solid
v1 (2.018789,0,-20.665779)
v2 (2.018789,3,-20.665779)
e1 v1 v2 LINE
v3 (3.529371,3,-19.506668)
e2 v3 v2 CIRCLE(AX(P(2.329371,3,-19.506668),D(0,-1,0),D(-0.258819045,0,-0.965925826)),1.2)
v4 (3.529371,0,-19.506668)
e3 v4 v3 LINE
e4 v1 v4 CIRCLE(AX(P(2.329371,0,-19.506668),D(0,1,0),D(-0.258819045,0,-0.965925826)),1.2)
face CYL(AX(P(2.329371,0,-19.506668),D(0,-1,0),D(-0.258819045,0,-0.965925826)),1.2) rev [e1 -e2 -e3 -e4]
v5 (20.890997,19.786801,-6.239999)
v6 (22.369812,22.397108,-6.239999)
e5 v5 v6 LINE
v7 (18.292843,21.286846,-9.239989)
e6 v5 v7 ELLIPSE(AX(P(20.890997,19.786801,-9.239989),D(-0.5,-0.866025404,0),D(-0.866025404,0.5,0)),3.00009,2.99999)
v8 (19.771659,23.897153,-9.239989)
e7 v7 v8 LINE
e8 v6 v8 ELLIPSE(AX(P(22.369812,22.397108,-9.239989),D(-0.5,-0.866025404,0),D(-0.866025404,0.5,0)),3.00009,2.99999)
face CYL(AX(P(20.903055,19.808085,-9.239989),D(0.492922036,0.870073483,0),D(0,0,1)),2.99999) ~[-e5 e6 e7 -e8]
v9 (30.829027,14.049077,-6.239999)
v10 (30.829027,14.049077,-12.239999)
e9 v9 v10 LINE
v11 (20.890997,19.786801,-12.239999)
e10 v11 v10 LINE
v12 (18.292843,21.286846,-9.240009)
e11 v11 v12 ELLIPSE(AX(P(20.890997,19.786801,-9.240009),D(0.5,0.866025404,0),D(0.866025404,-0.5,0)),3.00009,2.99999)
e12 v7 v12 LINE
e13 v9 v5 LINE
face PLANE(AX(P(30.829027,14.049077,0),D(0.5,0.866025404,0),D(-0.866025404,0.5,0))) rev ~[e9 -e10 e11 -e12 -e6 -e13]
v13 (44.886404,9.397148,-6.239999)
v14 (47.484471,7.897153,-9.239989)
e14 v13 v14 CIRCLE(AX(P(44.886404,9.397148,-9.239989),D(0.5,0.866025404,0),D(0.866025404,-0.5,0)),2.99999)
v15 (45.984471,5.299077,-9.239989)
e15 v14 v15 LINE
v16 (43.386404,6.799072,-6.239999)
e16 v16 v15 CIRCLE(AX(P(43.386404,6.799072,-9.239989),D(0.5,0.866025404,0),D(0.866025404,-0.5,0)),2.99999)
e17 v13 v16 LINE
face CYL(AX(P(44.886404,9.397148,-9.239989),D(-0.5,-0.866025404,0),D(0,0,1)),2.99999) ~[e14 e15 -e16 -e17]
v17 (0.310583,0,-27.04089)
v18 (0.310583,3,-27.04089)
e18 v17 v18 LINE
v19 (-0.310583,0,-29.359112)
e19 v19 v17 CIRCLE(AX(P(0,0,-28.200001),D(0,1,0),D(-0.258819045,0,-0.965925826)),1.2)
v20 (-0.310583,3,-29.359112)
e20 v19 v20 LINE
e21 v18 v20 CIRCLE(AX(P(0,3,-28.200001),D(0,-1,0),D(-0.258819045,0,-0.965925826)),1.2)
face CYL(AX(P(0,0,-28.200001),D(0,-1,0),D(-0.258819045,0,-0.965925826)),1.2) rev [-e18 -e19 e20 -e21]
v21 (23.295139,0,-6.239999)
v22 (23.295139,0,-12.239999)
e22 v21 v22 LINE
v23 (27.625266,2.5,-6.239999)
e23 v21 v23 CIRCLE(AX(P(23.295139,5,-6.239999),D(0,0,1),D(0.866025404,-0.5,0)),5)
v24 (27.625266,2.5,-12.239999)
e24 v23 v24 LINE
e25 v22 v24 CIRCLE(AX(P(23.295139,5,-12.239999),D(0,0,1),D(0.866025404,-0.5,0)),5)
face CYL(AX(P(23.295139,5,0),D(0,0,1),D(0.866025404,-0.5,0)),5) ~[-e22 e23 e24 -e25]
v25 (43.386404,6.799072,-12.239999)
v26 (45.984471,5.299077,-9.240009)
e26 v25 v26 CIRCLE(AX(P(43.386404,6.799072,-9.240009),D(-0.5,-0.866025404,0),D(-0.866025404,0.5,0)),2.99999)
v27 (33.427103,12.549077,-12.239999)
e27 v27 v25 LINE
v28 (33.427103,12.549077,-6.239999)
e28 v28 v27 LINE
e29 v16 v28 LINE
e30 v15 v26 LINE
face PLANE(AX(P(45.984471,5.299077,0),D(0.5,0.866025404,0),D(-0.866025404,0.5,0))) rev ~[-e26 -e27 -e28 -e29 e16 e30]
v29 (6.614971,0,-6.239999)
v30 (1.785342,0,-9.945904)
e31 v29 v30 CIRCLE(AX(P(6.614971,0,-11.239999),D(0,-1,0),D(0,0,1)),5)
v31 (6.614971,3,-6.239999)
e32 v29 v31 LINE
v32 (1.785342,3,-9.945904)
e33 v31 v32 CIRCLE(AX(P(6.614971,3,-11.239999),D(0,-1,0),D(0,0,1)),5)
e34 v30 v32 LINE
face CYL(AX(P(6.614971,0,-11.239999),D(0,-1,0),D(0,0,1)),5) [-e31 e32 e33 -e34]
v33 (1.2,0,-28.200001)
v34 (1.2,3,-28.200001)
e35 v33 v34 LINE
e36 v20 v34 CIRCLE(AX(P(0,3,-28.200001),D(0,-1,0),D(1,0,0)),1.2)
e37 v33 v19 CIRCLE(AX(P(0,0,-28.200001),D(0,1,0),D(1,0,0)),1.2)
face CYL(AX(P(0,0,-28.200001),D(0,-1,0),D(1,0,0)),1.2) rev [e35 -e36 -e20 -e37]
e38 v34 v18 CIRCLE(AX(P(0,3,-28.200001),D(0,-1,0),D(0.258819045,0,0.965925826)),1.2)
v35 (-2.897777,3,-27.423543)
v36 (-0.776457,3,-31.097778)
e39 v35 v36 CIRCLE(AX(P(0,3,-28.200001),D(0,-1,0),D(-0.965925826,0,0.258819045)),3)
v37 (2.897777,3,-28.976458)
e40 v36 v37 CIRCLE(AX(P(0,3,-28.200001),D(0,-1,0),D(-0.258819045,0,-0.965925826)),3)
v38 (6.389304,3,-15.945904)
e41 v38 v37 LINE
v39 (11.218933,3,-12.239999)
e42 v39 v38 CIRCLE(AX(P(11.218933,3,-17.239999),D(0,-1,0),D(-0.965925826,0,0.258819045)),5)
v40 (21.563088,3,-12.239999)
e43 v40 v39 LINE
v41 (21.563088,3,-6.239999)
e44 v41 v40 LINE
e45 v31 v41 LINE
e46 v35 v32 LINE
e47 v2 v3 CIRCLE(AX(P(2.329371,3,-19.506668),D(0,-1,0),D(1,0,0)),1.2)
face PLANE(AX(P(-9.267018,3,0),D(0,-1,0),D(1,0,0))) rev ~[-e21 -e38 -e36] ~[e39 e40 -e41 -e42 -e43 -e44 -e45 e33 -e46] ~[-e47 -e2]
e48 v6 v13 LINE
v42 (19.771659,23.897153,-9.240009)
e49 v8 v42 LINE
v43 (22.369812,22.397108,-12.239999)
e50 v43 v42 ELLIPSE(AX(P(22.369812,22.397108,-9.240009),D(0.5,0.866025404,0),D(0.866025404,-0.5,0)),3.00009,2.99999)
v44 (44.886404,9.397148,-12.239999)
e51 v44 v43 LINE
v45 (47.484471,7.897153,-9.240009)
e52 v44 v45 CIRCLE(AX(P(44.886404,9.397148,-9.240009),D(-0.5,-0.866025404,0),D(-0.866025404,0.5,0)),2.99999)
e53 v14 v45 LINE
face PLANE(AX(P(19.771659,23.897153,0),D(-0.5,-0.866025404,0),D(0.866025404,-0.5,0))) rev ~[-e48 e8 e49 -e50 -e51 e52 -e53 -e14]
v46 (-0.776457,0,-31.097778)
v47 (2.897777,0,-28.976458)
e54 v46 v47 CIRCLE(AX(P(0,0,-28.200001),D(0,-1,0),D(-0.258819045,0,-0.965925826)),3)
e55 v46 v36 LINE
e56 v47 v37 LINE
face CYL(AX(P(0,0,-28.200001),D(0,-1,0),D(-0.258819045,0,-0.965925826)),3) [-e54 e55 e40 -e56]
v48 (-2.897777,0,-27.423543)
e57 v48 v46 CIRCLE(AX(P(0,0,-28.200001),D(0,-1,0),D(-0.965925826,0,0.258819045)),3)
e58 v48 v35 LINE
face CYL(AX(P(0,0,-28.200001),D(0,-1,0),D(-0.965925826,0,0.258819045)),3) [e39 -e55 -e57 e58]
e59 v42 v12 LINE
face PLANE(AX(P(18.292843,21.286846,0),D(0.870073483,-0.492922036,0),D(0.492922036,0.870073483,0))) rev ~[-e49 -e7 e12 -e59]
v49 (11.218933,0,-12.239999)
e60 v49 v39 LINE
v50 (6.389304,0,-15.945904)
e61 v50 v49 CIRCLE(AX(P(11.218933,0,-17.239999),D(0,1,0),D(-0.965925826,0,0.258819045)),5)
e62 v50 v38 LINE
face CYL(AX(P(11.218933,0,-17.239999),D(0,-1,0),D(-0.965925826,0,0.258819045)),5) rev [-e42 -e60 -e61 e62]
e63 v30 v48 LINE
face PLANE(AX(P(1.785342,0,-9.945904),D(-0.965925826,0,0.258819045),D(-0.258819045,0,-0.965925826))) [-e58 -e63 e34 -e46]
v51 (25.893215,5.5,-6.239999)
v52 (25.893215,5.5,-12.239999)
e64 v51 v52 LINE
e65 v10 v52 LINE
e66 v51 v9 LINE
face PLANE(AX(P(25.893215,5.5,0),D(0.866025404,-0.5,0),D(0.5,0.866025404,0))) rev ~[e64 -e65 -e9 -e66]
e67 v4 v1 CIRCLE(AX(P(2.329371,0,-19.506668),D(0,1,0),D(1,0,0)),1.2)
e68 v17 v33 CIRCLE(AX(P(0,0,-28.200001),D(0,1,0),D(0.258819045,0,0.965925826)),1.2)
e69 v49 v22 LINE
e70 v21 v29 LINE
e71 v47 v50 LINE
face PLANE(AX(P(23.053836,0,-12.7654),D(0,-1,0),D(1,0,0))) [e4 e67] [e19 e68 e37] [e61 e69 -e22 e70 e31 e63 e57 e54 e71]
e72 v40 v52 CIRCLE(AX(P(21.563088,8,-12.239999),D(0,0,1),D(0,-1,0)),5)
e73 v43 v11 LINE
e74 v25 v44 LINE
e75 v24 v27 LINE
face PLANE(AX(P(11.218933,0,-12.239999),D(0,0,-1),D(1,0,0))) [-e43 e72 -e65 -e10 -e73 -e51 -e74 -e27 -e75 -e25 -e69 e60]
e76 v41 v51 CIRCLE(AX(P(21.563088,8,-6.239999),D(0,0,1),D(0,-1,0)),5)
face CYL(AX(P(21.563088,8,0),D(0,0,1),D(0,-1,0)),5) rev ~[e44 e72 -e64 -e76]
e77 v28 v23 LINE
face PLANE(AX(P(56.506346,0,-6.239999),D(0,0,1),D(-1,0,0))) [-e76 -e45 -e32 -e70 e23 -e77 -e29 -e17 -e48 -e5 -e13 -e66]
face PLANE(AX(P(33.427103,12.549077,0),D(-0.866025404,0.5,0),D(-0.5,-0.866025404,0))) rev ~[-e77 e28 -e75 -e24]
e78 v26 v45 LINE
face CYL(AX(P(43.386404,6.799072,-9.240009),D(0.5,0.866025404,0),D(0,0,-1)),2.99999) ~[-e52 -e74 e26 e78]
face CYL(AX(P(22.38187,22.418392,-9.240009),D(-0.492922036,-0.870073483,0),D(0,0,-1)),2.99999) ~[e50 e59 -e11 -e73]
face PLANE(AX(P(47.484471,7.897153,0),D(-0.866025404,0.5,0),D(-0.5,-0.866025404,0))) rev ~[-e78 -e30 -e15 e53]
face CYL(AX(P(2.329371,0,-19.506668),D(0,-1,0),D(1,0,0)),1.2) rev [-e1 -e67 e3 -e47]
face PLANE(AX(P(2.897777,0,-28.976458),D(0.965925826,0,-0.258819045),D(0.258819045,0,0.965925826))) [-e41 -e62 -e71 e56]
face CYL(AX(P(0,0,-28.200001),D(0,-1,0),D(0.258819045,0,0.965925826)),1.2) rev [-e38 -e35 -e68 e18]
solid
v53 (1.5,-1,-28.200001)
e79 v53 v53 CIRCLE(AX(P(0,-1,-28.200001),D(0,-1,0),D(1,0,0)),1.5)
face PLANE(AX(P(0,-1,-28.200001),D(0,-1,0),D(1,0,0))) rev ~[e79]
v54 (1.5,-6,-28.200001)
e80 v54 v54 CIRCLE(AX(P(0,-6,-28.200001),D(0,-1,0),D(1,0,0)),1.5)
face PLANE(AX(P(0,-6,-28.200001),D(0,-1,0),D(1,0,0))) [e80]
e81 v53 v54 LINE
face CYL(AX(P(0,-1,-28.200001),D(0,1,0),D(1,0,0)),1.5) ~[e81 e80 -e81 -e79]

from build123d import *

# Parameters (mm, degrees)
F3_R     = 1.5
F4_DEPTH = 5
F5_DEPTH = 100
F0_W     = 123.8063722849
F0_H     = 159.0860895813
F6_DEPTH = 31.2010005245
F7_R     = 2.99999


# Not quite as in the source:
# - a fillet or chamfer is up to 0.001 mm smaller than in the source, because OpenCascade refuses the exact size


with BuildPart() as f4:
    # F3 (on offset) → F4 (new body)
    with BuildSketch(Plane.XZ.offset(1)):
        with Locations((0, -28.2000005245)):
            Circle(F3_R)
    extrude(amount=F4_DEPTH)


with BuildPart() as f5:
    # F1 (on Front) → F5 (new body)
    with BuildSketch(Plane.XZ):
        with BuildLine():
            Line((1.7853418934, -9.9459039539), (-2.8977774789, -27.4235433892))
            ThreePointArc((-2.8977774789, -27.4235433892), (-2.5980762114, -29.7000005245), (-0.7764571353, -31.0977780034))
            ThreePointArc((-0.7764571353, -31.0977780034), (1.5, -30.7980767359), (2.8977774789, -28.9764576598))
            Line((2.8977774789, -28.9764576598), (6.3893038213, -15.9459039539))
            ThreePointArc((6.3893038213, -15.9459039539), (8.1751258077, -13.273232478), (11.2189329527, -12.2399991794))
            Line((11.2189329527, -12.2399991794), (56.5063462641, -12.2399991794))
            Line((56.5063462641, -12.2399991794), (56.5063462641, -6.2399991794))
            Line((56.5063462641, -6.2399991794), (6.6149710249, -6.2399991794))
            ThreePointArc((6.6149710249, -6.2399991794), (3.5711638798, -7.273232478), (1.7853418934, -9.9459039539))
        make_face()
        with BuildLine():
            ThreePointArc((1.2, -28.2000005245), (0.7305137148, -29.1520245329), (-0.3105828541, -29.3591115161))
            ThreePointArc((-0.3105828541, -29.3591115161), (-1.1591109915, -27.8894176704), (0.3105828541, -27.040889533))
            ThreePointArc((0.3105828541, -27.040889533), (0.9520240083, -27.4694868097), (1.2, -28.2000005245))
        make_face(mode=Mode.SUBTRACT)
        with BuildLine():
            ThreePointArc((3.5293714059, -19.5066680879), (3.0598851207, -20.4586920963), (2.0187885518, -20.6657790795))
            ThreePointArc((2.0187885518, -20.6657790795), (1.5988576911, -18.5546440796), (3.5293714059, -19.5066680879))
        make_face(mode=Mode.SUBTRACT)
    extrude(amount=-F5_DEPTH)

    # F0 (on Top) → F6 (cut, through all)
    with BuildSketch(Plane.XY):
        with Locations((20.0330018997, 51.0744024068)):
            Rectangle(F0_W, F0_H)
        with BuildLine():
            Line((30.8290268609, 14.0490771528), (18.2928432391, 21.2868461414))
            Line((18.2928432391, 21.2868461414), (19.771658506, 23.8971533641))
            Line((19.771658506, 23.8971533641), (47.4844714271, 7.8971533641))
            Line((47.4844714271, 7.8971533641), (45.9844714271, 5.2990771528))
            Line((45.9844714271, 5.2990771528), (33.4271030722, 12.5490771528))
            Line((33.4271030722, 12.5490771528), (27.625265673, 2.5))
            ThreePointArc((27.625265673, 2.5), (25.7951386541, 0.6698729811), (23.2951386541, 0))
            Line((23.2951386541, 0), (0, 0))
            Line((0, 0), (-9.2670181766, 0))
            Line((-9.2670181766, 0), (-9.2670181766, 3))
            Line((-9.2670181766, 3), (0, 3))
            Line((0, 3), (21.5630878465, 3))
            ThreePointArc((21.5630878465, 3), (24.0630878465, 3.6698729811), (25.8932148654, 5.5))
            Line((25.8932148654, 5.5), (30.8290268609, 14.0490771528))
        make_face(mode=Mode.SUBTRACT)
        with BuildLine():
            ThreePointArc((186.4293499082, 37.2767830718), (189.1206068421, 41.7118372377), (194.29723209, 41.3725432932))
            Line((194.29723209, 41.3725432932), (212.3185770643, 28.7538616935))
            Line((212.3185770643, 28.7538616935), (214.0393063734, 31.2113178264))
            Line((214.0393063734, 31.2113178264), (196.017961399, 43.8299994261))
            ThreePointArc((196.017961399, 43.8299994261), (187.7353610024, 44.3728697372), (183.4293499082, 37.2767830718))
            Line((183.4293499082, 37.2767830718), (183.4293499082, 8.5356936807))
            ThreePointArc((183.4293499082, 8.5356936807), (181.9648838142, 5.0001597747), (178.4293499082, 3.5356936807))
            Line((178.4293499082, 3.5356936807), (134.4964219123, 3.5356936807))
            Line((134.4964219123, 3.5356936807), (134.4964219123, 0.5356936807))
            Line((134.4964219123, 0.5356936807), (178.4293499082, 0.5356936807))
            ThreePointArc((178.4293499082, 0.5356936807), (184.0862041577, 2.8788394312), (186.4293499082, 8.5356936807))
            Line((186.4293499082, 8.5356936807), (186.4293499082, 37.2767830718))
        make_face()
    extrude(amount=-F6_DEPTH, mode=Mode.SUBTRACT)

    # F7 (radius 3 in the source; OpenCascade refuses exactly that, so slightly less here)
    f7_edges = [f5.edges().sort_by_distance(p)[0] for p in [
        (19.032251, 22.592, -6.239999),
        (46.734471, 6.598115, -6.239999),
        (46.734471, 6.598115, -12.239999),
        (19.032251, 22.592, -12.239999),
    ]]
    fillet(f7_edges, radius=F7_R)


solid = Compound([f4.part, f5.part])
